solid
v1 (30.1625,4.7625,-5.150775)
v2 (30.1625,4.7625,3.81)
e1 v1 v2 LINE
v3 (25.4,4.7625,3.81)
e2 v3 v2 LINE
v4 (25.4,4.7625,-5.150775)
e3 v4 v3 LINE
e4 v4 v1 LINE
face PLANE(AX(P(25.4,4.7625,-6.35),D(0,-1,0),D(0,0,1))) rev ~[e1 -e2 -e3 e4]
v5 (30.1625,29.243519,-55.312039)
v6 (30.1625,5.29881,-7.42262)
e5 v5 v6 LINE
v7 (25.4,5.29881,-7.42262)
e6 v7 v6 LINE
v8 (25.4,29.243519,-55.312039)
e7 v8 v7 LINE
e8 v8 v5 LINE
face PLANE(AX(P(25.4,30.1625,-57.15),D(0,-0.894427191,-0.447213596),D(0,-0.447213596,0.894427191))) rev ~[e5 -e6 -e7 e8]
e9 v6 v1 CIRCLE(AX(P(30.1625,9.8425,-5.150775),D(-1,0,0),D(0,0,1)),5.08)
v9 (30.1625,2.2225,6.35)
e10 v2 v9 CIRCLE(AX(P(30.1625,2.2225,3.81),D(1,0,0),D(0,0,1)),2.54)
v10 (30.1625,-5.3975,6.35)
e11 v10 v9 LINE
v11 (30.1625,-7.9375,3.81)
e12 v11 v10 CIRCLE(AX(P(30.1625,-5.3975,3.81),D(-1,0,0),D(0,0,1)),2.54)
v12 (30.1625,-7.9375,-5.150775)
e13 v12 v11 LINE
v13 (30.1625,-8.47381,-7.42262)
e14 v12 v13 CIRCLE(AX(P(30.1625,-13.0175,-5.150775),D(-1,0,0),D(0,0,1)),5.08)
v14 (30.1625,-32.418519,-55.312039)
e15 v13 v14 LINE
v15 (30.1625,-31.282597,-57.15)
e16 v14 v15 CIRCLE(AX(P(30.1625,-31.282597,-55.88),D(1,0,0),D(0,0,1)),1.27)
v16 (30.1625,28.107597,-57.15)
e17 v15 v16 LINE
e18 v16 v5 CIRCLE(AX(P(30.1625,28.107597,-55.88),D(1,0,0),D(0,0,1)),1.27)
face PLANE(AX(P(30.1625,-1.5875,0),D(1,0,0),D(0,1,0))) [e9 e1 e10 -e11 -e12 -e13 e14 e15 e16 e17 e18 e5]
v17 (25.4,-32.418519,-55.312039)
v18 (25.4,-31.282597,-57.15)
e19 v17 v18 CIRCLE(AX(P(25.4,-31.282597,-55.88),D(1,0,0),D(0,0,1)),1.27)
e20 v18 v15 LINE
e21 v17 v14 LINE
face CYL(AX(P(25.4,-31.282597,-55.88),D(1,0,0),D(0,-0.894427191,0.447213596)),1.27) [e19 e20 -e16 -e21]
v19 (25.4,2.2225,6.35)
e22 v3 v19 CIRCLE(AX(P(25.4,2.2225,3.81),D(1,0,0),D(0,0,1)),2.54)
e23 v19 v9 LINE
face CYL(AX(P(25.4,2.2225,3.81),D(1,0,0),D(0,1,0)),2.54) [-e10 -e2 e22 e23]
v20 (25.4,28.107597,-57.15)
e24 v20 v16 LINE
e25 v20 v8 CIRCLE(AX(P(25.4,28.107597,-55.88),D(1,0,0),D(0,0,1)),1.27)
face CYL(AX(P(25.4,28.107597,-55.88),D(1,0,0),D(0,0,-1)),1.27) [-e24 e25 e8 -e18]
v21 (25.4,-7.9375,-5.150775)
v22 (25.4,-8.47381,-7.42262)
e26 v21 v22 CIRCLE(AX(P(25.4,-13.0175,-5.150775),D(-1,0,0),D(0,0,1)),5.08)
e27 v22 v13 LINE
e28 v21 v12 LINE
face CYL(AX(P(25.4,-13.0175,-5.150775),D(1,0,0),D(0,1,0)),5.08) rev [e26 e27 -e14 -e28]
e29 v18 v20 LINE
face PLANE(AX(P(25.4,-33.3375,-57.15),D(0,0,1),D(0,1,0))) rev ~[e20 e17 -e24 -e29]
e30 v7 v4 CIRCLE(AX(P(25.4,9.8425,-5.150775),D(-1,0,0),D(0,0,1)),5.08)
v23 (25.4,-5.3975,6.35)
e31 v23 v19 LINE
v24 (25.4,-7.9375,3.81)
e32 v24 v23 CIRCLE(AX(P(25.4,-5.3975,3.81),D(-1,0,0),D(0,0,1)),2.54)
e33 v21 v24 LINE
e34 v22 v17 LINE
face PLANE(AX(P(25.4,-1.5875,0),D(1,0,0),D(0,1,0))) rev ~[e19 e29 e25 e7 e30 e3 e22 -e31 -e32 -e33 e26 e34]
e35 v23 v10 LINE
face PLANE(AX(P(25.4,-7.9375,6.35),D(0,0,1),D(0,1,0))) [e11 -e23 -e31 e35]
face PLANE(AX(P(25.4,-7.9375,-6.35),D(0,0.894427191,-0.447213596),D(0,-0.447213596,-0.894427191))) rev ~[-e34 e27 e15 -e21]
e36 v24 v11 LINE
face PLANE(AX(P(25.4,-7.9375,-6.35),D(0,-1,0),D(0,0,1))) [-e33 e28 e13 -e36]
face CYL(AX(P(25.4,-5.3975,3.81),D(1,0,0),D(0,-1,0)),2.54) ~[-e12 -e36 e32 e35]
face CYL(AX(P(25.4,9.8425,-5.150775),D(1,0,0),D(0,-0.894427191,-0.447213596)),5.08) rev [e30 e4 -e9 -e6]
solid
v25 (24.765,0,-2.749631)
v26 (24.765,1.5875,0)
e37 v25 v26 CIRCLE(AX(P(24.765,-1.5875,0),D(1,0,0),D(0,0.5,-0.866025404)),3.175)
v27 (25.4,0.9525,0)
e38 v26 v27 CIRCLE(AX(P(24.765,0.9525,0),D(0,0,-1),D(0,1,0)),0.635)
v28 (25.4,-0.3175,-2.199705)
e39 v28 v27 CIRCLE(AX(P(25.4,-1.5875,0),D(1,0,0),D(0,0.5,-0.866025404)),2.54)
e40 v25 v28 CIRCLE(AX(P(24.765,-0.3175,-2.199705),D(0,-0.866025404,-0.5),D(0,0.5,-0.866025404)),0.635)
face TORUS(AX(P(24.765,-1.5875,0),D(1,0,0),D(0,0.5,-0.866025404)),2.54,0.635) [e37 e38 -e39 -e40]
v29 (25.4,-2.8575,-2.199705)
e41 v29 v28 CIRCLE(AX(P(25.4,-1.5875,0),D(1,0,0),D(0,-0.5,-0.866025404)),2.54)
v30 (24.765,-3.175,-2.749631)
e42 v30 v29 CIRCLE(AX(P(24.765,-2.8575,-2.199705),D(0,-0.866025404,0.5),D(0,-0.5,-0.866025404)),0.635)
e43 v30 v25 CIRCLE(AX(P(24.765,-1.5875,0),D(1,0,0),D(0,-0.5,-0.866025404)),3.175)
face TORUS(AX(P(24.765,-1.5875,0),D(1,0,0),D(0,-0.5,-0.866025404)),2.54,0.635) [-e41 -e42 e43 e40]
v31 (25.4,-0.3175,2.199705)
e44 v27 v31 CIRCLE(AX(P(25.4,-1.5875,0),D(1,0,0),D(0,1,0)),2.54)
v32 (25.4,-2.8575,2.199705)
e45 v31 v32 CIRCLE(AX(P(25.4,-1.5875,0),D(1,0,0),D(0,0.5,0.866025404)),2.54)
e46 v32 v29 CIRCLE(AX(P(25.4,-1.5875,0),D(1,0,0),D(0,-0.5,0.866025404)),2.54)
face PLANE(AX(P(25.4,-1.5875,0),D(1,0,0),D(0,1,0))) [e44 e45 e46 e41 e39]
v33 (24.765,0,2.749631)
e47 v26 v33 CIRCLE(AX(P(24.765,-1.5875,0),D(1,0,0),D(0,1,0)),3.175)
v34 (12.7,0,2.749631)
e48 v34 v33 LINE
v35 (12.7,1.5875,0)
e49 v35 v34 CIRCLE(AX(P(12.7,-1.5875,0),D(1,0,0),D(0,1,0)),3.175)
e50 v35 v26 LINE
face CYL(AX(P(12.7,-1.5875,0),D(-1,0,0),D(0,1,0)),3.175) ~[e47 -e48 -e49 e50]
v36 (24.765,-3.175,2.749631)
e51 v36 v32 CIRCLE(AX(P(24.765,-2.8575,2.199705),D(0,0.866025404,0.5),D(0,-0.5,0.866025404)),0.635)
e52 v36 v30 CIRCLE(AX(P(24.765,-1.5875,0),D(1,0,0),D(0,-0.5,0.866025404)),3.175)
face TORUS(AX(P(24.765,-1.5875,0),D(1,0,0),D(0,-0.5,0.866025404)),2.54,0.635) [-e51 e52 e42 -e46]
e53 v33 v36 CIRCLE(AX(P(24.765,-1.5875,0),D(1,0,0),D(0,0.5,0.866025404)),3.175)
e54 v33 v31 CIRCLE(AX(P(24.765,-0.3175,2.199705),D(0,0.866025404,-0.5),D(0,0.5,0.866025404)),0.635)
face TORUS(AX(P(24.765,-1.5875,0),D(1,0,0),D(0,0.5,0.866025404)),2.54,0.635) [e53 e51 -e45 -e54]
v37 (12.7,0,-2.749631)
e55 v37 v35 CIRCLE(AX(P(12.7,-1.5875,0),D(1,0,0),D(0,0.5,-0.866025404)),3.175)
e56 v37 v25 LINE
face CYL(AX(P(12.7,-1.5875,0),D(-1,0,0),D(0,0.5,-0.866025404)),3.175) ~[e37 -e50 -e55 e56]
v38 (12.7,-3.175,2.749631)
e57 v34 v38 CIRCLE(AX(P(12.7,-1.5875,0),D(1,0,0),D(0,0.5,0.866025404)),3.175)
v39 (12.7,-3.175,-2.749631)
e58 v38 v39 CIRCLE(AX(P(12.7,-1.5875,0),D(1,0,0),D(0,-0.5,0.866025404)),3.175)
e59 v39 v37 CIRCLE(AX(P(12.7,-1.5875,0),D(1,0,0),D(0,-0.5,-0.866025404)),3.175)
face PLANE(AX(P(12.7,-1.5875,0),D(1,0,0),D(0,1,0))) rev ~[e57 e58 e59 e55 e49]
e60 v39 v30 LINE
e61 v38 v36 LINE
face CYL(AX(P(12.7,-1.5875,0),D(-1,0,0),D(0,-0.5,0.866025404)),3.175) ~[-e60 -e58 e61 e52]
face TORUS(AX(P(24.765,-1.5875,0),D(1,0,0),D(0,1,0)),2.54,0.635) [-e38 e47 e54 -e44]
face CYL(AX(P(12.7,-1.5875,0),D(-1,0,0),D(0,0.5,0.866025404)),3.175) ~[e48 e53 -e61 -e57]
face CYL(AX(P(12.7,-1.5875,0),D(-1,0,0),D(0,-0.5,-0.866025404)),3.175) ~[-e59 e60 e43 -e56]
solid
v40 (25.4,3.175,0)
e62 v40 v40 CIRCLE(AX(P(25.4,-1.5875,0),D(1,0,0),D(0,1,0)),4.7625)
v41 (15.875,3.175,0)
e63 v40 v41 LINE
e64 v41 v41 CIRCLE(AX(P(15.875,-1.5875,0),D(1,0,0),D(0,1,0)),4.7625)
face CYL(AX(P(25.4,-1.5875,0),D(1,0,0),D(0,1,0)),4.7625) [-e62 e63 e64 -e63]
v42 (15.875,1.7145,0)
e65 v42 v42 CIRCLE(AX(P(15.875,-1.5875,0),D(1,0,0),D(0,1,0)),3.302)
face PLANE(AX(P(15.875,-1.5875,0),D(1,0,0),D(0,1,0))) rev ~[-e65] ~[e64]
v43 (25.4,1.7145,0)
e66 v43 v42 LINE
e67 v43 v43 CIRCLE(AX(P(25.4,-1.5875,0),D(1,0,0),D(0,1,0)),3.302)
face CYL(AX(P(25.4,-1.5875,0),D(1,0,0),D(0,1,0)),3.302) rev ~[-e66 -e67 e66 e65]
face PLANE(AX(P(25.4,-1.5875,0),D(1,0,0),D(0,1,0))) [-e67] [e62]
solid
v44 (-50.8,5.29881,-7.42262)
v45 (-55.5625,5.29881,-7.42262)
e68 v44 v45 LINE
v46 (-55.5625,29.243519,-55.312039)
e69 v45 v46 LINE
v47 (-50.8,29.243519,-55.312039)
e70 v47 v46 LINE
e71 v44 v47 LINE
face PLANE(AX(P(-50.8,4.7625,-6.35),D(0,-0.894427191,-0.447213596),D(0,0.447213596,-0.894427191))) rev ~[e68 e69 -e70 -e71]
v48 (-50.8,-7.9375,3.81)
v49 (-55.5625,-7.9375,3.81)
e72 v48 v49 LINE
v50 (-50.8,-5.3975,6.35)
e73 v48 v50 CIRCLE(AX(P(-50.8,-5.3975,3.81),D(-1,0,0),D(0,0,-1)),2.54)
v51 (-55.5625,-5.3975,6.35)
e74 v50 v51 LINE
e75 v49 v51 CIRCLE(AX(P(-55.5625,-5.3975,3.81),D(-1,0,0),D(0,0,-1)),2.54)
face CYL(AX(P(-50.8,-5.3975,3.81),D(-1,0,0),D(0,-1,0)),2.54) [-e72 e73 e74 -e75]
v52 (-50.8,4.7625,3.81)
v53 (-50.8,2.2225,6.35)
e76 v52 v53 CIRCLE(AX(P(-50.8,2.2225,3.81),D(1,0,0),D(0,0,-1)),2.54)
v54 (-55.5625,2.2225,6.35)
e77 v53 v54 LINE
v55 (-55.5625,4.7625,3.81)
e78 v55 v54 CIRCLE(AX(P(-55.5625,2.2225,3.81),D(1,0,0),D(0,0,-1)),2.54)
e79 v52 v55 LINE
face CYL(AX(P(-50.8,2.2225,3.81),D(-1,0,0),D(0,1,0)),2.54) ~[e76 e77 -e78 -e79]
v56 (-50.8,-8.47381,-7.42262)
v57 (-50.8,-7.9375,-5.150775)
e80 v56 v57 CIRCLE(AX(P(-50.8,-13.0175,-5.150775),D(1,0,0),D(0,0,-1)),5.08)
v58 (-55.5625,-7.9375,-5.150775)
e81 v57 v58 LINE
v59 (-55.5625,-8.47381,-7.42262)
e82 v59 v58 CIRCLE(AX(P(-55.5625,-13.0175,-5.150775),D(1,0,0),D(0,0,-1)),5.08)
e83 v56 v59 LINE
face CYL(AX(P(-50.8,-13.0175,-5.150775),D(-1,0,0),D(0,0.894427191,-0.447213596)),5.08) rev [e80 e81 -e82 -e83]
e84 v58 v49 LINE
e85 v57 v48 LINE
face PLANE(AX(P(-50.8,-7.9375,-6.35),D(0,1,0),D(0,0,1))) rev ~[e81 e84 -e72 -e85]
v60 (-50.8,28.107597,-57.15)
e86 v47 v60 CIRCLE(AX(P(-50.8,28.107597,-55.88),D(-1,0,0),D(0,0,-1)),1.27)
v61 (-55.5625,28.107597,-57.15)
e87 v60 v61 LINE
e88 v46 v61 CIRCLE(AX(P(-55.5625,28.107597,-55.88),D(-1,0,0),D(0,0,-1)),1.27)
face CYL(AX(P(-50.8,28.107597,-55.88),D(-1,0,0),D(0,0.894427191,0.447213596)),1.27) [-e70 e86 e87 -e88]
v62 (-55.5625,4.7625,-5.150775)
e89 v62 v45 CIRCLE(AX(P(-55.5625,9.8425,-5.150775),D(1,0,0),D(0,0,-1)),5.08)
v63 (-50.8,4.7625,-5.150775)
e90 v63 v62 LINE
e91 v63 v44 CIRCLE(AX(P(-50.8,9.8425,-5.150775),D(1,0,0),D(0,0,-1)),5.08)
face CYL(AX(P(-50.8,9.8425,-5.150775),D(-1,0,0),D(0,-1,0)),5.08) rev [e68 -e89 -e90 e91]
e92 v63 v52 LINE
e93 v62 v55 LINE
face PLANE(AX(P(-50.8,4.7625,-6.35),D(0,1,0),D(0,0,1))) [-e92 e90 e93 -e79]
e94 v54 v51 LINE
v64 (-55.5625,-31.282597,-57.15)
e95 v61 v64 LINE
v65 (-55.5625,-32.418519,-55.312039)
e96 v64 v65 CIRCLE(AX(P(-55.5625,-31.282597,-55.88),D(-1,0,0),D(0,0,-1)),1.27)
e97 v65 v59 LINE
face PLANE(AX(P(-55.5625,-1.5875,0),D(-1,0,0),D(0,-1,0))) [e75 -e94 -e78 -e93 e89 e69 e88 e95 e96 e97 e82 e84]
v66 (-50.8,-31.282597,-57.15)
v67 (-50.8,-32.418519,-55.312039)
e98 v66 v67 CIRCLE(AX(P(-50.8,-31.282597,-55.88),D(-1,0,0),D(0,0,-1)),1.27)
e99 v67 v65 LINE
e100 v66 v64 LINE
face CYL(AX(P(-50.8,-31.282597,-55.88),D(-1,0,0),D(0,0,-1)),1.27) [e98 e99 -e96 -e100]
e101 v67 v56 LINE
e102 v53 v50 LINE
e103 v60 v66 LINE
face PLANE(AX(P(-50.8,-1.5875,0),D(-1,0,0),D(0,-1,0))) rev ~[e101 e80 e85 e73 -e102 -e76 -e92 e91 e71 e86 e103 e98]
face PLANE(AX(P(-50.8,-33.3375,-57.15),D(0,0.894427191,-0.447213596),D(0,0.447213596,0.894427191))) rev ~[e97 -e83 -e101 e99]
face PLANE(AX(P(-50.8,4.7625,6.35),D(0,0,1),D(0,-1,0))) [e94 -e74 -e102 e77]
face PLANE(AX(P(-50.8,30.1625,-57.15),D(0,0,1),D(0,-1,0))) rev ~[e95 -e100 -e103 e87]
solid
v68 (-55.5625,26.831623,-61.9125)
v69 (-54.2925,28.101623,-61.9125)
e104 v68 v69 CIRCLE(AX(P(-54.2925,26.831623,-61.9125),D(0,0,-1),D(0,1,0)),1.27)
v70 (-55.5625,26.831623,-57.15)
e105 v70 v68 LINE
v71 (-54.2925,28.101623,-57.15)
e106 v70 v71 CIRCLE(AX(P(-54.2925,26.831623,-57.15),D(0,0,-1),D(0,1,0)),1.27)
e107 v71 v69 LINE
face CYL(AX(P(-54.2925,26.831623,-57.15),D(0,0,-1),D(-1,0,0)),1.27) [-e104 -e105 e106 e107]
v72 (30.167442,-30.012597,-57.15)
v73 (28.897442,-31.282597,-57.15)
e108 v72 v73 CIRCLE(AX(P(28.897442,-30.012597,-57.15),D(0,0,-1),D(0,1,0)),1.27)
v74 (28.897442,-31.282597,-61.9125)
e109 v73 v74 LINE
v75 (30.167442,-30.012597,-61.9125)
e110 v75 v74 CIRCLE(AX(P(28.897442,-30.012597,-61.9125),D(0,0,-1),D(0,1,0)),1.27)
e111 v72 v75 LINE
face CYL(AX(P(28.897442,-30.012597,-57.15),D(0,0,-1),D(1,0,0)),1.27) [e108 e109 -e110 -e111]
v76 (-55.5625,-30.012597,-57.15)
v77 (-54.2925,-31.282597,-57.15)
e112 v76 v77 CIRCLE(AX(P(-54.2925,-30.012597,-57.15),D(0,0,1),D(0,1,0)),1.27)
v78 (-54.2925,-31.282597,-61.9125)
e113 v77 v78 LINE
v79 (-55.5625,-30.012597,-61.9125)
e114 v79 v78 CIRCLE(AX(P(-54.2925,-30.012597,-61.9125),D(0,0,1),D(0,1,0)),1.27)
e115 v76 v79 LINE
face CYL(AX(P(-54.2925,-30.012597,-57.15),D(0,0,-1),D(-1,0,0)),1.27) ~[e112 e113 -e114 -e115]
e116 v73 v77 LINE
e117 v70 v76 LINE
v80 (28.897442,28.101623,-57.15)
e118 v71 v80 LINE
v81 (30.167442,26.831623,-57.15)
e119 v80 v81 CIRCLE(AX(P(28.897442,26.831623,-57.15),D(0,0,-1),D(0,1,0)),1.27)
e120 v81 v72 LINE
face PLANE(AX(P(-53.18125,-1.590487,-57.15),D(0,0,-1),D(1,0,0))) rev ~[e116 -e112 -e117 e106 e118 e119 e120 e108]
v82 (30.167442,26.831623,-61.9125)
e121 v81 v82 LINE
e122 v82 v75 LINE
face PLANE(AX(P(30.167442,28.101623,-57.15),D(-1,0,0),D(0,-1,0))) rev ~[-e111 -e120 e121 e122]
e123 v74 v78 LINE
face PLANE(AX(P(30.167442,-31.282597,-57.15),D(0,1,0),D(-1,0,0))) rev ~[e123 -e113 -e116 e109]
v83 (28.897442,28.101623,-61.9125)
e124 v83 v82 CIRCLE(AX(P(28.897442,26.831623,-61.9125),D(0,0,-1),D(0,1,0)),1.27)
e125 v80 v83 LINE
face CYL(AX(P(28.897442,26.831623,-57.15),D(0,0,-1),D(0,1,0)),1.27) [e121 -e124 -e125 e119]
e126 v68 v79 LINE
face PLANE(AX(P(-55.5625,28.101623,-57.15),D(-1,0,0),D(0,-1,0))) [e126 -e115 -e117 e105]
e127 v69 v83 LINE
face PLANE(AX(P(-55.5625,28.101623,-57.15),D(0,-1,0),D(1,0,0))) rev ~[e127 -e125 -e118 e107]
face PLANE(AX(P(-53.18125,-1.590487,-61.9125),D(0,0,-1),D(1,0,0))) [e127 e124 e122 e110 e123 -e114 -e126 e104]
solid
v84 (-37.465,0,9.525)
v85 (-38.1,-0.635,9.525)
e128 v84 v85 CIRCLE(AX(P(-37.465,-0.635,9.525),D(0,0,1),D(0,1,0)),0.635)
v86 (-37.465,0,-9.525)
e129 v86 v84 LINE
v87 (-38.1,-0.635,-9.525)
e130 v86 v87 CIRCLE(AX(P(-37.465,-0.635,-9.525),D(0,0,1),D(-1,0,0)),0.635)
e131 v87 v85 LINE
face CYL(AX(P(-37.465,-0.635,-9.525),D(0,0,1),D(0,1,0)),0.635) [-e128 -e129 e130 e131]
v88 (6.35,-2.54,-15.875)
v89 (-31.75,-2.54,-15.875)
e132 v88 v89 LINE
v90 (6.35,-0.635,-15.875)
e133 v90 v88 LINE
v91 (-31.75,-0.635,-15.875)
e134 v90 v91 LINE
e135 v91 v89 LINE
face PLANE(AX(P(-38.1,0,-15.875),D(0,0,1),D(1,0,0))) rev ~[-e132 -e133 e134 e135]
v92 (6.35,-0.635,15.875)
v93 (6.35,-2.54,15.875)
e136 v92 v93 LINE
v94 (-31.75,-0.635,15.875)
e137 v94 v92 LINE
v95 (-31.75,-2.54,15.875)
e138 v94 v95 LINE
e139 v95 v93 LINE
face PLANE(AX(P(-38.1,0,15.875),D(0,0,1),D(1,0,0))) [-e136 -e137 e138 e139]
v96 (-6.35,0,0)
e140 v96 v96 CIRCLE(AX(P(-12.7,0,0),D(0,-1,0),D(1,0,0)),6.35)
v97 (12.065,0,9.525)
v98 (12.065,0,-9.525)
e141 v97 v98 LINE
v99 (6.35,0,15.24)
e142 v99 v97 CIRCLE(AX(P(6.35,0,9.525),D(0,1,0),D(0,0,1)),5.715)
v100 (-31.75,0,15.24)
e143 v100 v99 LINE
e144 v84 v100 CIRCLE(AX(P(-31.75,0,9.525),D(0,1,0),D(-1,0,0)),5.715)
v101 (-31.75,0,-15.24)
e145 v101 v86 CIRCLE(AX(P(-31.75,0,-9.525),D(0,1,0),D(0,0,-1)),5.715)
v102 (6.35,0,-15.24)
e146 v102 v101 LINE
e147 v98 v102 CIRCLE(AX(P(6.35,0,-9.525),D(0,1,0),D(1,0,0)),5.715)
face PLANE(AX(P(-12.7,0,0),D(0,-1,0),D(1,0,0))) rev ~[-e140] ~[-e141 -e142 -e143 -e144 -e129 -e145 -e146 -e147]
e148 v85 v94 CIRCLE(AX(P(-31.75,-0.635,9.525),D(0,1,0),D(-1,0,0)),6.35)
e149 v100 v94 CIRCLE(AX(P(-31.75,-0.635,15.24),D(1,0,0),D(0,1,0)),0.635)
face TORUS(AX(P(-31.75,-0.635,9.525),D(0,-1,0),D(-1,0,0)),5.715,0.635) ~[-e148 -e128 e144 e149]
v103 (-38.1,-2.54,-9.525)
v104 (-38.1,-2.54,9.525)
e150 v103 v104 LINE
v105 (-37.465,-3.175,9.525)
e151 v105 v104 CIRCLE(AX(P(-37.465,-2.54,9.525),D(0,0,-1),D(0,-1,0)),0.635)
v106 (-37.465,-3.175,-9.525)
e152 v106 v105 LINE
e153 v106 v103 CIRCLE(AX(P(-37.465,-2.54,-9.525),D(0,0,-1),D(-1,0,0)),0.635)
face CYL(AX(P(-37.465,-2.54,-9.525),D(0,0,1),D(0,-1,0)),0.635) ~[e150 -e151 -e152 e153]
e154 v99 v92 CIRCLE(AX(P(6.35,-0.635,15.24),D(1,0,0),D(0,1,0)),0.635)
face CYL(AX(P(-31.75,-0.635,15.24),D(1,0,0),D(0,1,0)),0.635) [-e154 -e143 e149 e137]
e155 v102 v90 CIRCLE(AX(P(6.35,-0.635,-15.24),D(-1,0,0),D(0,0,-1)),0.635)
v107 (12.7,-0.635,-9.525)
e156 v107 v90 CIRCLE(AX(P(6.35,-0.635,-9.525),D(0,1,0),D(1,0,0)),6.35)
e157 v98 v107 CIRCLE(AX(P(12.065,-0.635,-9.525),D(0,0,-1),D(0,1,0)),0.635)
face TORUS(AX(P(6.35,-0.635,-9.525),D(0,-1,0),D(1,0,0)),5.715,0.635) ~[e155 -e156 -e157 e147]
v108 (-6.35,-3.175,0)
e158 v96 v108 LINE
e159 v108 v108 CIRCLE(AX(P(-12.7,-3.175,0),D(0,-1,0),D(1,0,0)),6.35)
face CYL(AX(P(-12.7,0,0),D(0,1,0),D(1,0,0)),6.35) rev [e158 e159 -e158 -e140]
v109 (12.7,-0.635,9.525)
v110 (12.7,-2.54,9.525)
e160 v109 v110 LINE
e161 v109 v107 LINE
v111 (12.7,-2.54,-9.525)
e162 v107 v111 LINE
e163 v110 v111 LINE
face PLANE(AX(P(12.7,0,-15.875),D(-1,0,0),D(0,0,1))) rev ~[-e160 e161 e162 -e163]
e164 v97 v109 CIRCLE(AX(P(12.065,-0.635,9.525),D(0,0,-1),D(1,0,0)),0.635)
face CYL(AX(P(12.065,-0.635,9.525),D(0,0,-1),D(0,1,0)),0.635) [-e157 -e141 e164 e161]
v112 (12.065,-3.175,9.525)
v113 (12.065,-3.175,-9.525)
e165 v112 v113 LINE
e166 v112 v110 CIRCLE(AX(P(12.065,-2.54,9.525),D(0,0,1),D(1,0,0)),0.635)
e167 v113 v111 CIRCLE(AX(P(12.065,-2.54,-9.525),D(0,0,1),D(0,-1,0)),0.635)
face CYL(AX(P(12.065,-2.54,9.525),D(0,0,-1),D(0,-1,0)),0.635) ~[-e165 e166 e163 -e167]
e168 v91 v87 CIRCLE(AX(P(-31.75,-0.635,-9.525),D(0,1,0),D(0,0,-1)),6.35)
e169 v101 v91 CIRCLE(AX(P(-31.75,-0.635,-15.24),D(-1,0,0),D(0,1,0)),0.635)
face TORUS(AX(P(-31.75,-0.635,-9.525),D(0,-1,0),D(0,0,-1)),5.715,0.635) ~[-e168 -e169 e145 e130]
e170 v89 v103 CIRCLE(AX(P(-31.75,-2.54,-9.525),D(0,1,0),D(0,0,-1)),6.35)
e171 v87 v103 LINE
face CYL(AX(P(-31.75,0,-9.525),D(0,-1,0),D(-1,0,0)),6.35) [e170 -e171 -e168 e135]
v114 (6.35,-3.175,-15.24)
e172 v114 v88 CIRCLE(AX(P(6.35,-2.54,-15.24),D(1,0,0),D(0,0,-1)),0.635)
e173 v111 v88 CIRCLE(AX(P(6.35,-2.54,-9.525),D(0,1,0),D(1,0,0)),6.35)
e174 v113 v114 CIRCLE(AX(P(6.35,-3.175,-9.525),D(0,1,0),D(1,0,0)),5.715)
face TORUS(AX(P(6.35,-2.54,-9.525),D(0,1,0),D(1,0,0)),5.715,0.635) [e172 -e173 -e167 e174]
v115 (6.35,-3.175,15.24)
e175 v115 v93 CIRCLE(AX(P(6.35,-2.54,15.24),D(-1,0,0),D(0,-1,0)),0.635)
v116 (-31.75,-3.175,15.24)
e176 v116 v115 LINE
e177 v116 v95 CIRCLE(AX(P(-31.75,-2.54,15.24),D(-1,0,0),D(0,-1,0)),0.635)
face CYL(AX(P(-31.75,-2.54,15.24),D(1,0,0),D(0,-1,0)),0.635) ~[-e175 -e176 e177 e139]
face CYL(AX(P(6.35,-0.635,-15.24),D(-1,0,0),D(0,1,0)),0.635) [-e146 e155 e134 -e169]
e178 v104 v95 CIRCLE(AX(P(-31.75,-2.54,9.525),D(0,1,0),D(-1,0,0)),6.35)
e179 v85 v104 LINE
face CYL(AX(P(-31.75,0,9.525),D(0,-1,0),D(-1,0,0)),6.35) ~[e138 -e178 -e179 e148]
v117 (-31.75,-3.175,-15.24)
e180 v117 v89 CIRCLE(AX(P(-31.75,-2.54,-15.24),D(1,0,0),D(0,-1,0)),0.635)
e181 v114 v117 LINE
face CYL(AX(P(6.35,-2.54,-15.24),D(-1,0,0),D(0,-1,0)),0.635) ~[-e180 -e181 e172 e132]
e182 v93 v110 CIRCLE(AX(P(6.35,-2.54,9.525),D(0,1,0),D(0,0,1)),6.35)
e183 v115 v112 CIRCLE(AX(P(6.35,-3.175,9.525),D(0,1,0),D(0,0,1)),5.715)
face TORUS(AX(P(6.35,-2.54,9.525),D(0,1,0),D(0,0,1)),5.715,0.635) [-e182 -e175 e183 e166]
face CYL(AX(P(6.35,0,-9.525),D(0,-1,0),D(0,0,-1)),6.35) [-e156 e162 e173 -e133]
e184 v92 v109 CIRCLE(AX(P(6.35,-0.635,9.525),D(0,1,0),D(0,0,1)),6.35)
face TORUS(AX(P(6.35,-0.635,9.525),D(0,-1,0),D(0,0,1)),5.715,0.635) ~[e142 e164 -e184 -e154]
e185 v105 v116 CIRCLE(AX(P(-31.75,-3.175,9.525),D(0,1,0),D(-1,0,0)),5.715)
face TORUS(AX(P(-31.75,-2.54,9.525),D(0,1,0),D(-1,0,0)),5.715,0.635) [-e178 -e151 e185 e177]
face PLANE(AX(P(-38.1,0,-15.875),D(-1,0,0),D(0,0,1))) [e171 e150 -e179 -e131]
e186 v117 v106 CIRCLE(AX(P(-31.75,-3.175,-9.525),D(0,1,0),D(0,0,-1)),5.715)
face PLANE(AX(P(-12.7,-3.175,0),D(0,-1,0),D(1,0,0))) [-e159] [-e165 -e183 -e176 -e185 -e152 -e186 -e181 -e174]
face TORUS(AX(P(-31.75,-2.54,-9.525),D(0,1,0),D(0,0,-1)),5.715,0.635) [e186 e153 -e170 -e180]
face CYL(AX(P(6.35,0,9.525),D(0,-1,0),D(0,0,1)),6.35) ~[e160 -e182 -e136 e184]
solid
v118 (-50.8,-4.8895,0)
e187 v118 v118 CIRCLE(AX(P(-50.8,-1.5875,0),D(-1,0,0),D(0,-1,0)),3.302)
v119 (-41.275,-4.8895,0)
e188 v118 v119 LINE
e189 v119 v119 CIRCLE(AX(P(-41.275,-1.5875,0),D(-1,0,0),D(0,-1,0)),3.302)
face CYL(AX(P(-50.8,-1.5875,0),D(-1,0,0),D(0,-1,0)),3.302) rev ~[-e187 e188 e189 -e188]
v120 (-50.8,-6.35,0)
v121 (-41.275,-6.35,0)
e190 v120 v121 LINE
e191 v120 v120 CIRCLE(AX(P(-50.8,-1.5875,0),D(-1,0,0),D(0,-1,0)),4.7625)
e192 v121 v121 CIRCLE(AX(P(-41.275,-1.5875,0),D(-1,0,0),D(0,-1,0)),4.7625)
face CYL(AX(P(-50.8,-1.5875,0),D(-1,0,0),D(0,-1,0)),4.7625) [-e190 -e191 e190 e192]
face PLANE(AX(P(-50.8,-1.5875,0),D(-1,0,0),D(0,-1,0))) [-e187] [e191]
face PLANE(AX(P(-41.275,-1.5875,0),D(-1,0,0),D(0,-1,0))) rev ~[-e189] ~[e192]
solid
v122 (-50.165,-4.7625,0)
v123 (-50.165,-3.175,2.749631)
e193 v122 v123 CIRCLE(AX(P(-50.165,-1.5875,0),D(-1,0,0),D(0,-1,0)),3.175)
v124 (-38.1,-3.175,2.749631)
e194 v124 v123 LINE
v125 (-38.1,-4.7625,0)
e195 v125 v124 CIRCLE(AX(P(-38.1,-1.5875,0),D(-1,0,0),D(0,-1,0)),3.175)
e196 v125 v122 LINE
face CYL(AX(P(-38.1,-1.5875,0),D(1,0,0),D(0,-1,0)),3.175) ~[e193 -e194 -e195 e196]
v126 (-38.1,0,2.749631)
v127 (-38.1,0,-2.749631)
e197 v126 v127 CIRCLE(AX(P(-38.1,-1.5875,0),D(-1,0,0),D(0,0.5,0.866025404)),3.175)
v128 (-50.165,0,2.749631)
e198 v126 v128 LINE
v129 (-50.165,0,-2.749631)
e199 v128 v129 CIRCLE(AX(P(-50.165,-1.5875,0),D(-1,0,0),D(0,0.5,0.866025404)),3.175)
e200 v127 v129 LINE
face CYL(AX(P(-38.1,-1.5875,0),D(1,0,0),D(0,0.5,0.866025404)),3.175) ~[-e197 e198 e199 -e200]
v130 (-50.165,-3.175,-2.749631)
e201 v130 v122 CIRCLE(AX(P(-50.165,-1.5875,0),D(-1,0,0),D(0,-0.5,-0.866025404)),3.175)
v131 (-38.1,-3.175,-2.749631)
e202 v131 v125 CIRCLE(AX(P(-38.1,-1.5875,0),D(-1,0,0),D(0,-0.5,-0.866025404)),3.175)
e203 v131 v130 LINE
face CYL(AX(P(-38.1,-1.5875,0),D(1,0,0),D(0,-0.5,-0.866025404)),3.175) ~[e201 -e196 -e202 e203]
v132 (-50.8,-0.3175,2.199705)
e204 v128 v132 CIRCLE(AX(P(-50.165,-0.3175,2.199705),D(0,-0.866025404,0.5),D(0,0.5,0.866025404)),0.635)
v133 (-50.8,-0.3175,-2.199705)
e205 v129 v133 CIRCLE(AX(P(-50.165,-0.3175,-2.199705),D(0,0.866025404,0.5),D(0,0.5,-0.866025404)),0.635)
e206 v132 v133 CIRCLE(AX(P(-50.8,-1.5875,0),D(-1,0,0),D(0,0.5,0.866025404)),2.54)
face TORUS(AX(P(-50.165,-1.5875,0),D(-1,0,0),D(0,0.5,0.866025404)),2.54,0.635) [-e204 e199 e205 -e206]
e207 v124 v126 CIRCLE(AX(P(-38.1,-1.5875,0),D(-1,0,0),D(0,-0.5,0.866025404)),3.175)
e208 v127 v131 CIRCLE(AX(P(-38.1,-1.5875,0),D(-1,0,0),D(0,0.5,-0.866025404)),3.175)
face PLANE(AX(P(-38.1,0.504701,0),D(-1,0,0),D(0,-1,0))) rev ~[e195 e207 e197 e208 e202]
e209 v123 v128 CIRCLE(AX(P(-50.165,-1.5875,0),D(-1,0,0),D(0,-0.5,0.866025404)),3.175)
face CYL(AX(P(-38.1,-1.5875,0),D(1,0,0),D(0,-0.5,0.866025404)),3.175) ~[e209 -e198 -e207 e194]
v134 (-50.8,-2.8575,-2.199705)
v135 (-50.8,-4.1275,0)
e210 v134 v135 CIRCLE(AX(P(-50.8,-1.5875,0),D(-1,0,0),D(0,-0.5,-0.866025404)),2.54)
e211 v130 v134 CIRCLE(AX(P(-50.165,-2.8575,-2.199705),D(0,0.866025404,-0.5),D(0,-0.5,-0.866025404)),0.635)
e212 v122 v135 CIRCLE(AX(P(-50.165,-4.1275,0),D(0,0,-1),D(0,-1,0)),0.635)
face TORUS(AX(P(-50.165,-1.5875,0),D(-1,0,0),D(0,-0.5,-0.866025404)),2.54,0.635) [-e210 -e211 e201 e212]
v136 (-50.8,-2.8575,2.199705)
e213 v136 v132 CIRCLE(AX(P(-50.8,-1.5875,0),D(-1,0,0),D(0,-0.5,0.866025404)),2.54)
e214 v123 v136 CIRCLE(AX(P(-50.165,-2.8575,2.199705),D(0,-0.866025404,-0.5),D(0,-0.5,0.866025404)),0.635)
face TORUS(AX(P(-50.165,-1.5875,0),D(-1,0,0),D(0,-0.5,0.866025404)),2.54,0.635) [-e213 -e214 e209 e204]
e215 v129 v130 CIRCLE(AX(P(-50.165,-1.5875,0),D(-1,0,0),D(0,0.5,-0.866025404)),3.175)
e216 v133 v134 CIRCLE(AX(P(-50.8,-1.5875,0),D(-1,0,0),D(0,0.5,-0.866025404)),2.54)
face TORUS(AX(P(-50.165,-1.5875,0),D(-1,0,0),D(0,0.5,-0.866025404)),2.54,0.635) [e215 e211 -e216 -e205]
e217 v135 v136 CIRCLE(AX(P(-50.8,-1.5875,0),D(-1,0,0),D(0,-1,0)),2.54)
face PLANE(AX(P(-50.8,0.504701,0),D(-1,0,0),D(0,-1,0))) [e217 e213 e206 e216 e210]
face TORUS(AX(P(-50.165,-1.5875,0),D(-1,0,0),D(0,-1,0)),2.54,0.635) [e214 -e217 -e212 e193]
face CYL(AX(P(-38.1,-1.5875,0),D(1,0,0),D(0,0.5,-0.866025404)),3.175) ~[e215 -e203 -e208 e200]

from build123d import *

# Parameters (mm, degrees)
F0_W      = 50.8
F0_H      = 31.75
F0_R      = 6.35
F1_DEPTH  = 3.175
F3_DEPTH  = 12.7
F5_DEPTH  = 12.7
F6_R      = 6.35
F7_R      = 0.635
F8_R      = 0.635
F9_R      = 0.635
F9_2_R    = 0.635
F10_R     = 4.7625
F10_R_2   = 3.302
F11_DEPTH = 9.525
F12_R     = 4.7625
F12_R_2   = 3.302
F13_DEPTH = 9.525
F14_W     = 12.7
F14_H     = 12.7
F14_R     = 4.7625
F14_R_2   = 3.302
F15_DEPTH = 4.7625
F16_W     = 12.7
F16_H     = 12.7
F16_R     = 4.7625
F16_R_2   = 3.302
F17_DEPTH = 4.7625
F18_R     = 2.54
F18_2_R   = 2.54
F19_R     = 5.08
F19_2_R   = 5.08
F20_R     = 1.27
F20_2_R   = 1.27
F21_W     = 4.7625
F21_H     = 59.3842198926
F21_W_2   = 80.9674418151
F22_DEPTH = 4.7625
F23_R     = 1.27


# Not quite as in the source:
# - a feature names something its author has since deleted; it is built from what else it names


with BuildPart() as f1:
    # F0 (on Front) → F1 (new body)
    with BuildSketch(Plane.XZ):
        with Locations((-12.7, 0)):
            Rectangle(F0_W, F0_H)
        with Locations((-12.7, 0)):
            Circle(F0_R, mode=Mode.SUBTRACT)
    extrude(amount=F1_DEPTH)

    # F6
    f6_edges = [f1.edges().sort_by_distance(p)[0] for p in [
        (-38.1, -1.5875, 15.875),
        (-38.1, -1.5875, -15.875),
        (12.7, -1.5875, -15.875),
        (12.7, -1.5875, 15.875),
    ]]
    fillet(f6_edges, radius=F6_R)

    # F7
    f7_edges = [f1.edges().sort_by_distance(p)[0] for p in [
        (-12.7, -3.175, 15.875),
    ]]
    fillet(f7_edges, radius=F7_R)

    # F8
    f8_edges = [f1.edges().sort_by_distance(p)[0] for p in [
        (-12.7, 0, 15.875),
    ]]
    fillet(f8_edges, radius=F8_R)


with BuildPart() as f3:
    # F2 (on face) → F3 (new body)
    with BuildSketch(Plane(origin=(-38.1, 0, 0), x_dir=(0, -1, 0), z_dir=(-1, 0, 0))):
        with BuildLine():
            Line((0, -2.749630657), (0, 2.749630657))
            ThreePointArc((0, 2.749630657), (-1.5875, 0), (0, -2.749630657))
        make_face()
        with BuildLine():
            Line((3.175, -2.749630657), (3.175, 2.749630657))
            ThreePointArc((3.175, 2.749630657), (1.5875, 3.175), (0, 2.749630657))
            Line((0, 2.749630657), (0, -2.749630657))
            ThreePointArc((0, -2.749630657), (1.5875, -3.175), (3.175, -2.749630657))
        make_face()
        with BuildLine():
            ThreePointArc((3.175, -2.749630657), (4.337130657, -1.5875), (4.7625, 0))
            ThreePointArc((4.7625, 0), (4.337130657, 1.5875), (3.175, 2.749630657))
            Line((3.175, 2.749630657), (3.175, -2.749630657))
        make_face()
    extrude(amount=F3_DEPTH)

    # F9
    f9_edges = [f3.edges().sort_by_distance(p)[0] for p in [
        (-50.8, 0, 2.749631),
    ]]
    fillet(f9_edges, radius=F9_R)


with BuildPart() as f5:
    # F4 (on face) → F5 (new body)
    with BuildSketch(Plane.YZ.offset(12.7)):
        with BuildLine():
            Line((0, -2.749630657), (0, 2.749630657))
            ThreePointArc((0, 2.749630657), (-1.5875, 3.175), (-3.175, 2.749630657))
            Line((-3.175, 2.749630657), (-3.175, -2.749630657))
            ThreePointArc((-3.175, -2.749630657), (-1.5875, -3.175), (0, -2.749630657))
        make_face()
        with BuildLine():
            Line((-3.175, -2.749630657), (-3.175, 2.749630657))
            ThreePointArc((-3.175, 2.749630657), (-4.7625, 0), (-3.175, -2.749630657))
        make_face()
        with BuildLine():
            ThreePointArc((0, -2.749630657), (1.162130657, -1.5875), (1.5875, 0))
            ThreePointArc((1.5875, 0), (1.162130657, 1.5875), (0, 2.749630657))
            Line((0, 2.749630657), (0, -2.749630657))
        make_face()
    extrude(amount=F5_DEPTH)

    # F9#2
    f9_2_edges = [f5.edges().sort_by_distance(p)[0] for p in [
        (25.4, -3.175, 2.749631),
    ]]
    fillet(f9_2_edges, radius=F9_2_R)


with BuildPart() as f11:
    # F10 (on face) → F11 (new body)
    with BuildSketch(Plane.YZ.offset(25.4)):
        with Locations((-1.5875, 0)):
            Circle(F10_R)
        with Locations((-1.5875, 0)):
            Circle(F10_R_2, mode=Mode.SUBTRACT)
    extrude(amount=-F11_DEPTH)


with BuildPart() as f13:
    # F12 (on face) → F13 (new body)
    with BuildSketch(Plane(origin=(-50.8, 0, 0), x_dir=(0, -1, 0), z_dir=(-1, 0, 0))):
        with Locations((1.5875, 0)):
            Circle(F12_R)
        with Locations((1.5875, 0)):
            Circle(F12_R_2, mode=Mode.SUBTRACT)
    extrude(amount=-F13_DEPTH)


with BuildPart() as f15:
    # F14 (on face) → F15 (new body)
    with BuildSketch(Plane.YZ.offset(25.4)):
        with Locations((-1.5875, 0)):
            Rectangle(F14_W, F14_H)
        with Locations((-1.5875, 0)):
            Circle(F14_R, mode=Mode.SUBTRACT)
        with Locations((-1.5875, 0)):
            Circle(F14_R)
        with Locations((-1.5875, 0)):
            Circle(F14_R_2, mode=Mode.SUBTRACT)
        with Locations((-1.5875, 0)):
            Circle(F14_R_2)
        Polygon((30.1625, -57.15), (4.7625, -6.35), (-7.9375, -6.35), (-33.3375, -57.15), align=None)
    extrude(amount=F15_DEPTH)

    # F18#2
    f18_2_edges = [f15.edges().sort_by_distance(p)[0] for p in [
        (27.78125, -7.9375, 6.35),
        (27.78125, 4.7625, 6.35),
    ]]
    fillet(f18_2_edges, radius=F18_2_R)

    # F19#2
    f19_2_edges = [f15.edges().sort_by_distance(p)[0] for p in [
        (27.78125, -7.9375, -6.35),
        (27.78125, 4.7625, -6.35),
    ]]
    fillet(f19_2_edges, radius=F19_2_R)

    # F20#2
    f20_2_edges = [f15.edges().sort_by_distance(p)[0] for p in [
        (27.78125, -33.3375, -57.15),
        (27.78125, 30.1625, -57.15),
    ]]
    fillet(f20_2_edges, radius=F20_2_R)


with BuildPart() as f17:
    # F16 (on face) → F17 (new body)
    with BuildSketch(Plane(origin=(-50.8, 0, 0), x_dir=(0, -1, 0), z_dir=(-1, 0, 0))):
        with Locations((1.5875, 0)):
            Rectangle(F16_W, F16_H)
        with Locations((1.5875, 0)):
            Circle(F16_R, mode=Mode.SUBTRACT)
        with Locations((1.5875, 0)):
            Circle(F16_R)
        with Locations((1.5875, 0)):
            Circle(F16_R_2, mode=Mode.SUBTRACT)
        with Locations((1.5875, 0)):
            Circle(F16_R_2)
        Polygon((33.3375, -57.15), (7.9375, -6.35), (-4.7625, -6.35), (-30.1625, -57.15), align=None)
    extrude(amount=F17_DEPTH)

    # F18
    f18_edges = [f17.edges().sort_by_distance(p)[0] for p in [
        (-53.18125, -7.9375, 6.35),
        (-53.18125, 4.7625, 6.35),
    ]]
    fillet(f18_edges, radius=F18_R)

    # F19
    f19_edges = [f17.edges().sort_by_distance(p)[0] for p in [
        (-53.18125, -7.9375, -6.35),
        (-53.18125, 4.7625, -6.35),
    ]]
    fillet(f19_edges, radius=F19_R)

    # F20
    f20_edges = [f17.edges().sort_by_distance(p)[0] for p in [
        (-53.18125, -33.3375, -57.15),
        (-53.18125, 30.1625, -57.15),
    ]]
    fillet(f20_edges, radius=F20_R)


with BuildPart() as f22:
    # F21 (on face) → F22 (new body)
    with BuildSketch(Plane(origin=(0, 0, -57.15), x_dir=(1, 0, 0), z_dir=(0, 0, -1))):
        with Locations((-53.18125, 1.590486888)):
            Rectangle(F21_W, F21_H)
        with Locations((-10.3162790924, 1.590486888)):
            Rectangle(F21_W_2, F21_H)
    extrude(amount=F22_DEPTH)

    # F23
    f23_edges = [f22.edges().sort_by_distance(p)[0] for p in [
        (-55.5625, -31.282597, -59.53125),
        (-55.5625, 28.101623, -59.53125),
        (30.167442, 28.101623, -59.53125),
        (30.167442, -31.282597, -59.53125),
    ]]
    fillet(f23_edges, radius=F23_R)


solid = Compound([f1.part, f3.part, f5.part, f11.part, f13.part, f15.part, f17.part, f22.part])
